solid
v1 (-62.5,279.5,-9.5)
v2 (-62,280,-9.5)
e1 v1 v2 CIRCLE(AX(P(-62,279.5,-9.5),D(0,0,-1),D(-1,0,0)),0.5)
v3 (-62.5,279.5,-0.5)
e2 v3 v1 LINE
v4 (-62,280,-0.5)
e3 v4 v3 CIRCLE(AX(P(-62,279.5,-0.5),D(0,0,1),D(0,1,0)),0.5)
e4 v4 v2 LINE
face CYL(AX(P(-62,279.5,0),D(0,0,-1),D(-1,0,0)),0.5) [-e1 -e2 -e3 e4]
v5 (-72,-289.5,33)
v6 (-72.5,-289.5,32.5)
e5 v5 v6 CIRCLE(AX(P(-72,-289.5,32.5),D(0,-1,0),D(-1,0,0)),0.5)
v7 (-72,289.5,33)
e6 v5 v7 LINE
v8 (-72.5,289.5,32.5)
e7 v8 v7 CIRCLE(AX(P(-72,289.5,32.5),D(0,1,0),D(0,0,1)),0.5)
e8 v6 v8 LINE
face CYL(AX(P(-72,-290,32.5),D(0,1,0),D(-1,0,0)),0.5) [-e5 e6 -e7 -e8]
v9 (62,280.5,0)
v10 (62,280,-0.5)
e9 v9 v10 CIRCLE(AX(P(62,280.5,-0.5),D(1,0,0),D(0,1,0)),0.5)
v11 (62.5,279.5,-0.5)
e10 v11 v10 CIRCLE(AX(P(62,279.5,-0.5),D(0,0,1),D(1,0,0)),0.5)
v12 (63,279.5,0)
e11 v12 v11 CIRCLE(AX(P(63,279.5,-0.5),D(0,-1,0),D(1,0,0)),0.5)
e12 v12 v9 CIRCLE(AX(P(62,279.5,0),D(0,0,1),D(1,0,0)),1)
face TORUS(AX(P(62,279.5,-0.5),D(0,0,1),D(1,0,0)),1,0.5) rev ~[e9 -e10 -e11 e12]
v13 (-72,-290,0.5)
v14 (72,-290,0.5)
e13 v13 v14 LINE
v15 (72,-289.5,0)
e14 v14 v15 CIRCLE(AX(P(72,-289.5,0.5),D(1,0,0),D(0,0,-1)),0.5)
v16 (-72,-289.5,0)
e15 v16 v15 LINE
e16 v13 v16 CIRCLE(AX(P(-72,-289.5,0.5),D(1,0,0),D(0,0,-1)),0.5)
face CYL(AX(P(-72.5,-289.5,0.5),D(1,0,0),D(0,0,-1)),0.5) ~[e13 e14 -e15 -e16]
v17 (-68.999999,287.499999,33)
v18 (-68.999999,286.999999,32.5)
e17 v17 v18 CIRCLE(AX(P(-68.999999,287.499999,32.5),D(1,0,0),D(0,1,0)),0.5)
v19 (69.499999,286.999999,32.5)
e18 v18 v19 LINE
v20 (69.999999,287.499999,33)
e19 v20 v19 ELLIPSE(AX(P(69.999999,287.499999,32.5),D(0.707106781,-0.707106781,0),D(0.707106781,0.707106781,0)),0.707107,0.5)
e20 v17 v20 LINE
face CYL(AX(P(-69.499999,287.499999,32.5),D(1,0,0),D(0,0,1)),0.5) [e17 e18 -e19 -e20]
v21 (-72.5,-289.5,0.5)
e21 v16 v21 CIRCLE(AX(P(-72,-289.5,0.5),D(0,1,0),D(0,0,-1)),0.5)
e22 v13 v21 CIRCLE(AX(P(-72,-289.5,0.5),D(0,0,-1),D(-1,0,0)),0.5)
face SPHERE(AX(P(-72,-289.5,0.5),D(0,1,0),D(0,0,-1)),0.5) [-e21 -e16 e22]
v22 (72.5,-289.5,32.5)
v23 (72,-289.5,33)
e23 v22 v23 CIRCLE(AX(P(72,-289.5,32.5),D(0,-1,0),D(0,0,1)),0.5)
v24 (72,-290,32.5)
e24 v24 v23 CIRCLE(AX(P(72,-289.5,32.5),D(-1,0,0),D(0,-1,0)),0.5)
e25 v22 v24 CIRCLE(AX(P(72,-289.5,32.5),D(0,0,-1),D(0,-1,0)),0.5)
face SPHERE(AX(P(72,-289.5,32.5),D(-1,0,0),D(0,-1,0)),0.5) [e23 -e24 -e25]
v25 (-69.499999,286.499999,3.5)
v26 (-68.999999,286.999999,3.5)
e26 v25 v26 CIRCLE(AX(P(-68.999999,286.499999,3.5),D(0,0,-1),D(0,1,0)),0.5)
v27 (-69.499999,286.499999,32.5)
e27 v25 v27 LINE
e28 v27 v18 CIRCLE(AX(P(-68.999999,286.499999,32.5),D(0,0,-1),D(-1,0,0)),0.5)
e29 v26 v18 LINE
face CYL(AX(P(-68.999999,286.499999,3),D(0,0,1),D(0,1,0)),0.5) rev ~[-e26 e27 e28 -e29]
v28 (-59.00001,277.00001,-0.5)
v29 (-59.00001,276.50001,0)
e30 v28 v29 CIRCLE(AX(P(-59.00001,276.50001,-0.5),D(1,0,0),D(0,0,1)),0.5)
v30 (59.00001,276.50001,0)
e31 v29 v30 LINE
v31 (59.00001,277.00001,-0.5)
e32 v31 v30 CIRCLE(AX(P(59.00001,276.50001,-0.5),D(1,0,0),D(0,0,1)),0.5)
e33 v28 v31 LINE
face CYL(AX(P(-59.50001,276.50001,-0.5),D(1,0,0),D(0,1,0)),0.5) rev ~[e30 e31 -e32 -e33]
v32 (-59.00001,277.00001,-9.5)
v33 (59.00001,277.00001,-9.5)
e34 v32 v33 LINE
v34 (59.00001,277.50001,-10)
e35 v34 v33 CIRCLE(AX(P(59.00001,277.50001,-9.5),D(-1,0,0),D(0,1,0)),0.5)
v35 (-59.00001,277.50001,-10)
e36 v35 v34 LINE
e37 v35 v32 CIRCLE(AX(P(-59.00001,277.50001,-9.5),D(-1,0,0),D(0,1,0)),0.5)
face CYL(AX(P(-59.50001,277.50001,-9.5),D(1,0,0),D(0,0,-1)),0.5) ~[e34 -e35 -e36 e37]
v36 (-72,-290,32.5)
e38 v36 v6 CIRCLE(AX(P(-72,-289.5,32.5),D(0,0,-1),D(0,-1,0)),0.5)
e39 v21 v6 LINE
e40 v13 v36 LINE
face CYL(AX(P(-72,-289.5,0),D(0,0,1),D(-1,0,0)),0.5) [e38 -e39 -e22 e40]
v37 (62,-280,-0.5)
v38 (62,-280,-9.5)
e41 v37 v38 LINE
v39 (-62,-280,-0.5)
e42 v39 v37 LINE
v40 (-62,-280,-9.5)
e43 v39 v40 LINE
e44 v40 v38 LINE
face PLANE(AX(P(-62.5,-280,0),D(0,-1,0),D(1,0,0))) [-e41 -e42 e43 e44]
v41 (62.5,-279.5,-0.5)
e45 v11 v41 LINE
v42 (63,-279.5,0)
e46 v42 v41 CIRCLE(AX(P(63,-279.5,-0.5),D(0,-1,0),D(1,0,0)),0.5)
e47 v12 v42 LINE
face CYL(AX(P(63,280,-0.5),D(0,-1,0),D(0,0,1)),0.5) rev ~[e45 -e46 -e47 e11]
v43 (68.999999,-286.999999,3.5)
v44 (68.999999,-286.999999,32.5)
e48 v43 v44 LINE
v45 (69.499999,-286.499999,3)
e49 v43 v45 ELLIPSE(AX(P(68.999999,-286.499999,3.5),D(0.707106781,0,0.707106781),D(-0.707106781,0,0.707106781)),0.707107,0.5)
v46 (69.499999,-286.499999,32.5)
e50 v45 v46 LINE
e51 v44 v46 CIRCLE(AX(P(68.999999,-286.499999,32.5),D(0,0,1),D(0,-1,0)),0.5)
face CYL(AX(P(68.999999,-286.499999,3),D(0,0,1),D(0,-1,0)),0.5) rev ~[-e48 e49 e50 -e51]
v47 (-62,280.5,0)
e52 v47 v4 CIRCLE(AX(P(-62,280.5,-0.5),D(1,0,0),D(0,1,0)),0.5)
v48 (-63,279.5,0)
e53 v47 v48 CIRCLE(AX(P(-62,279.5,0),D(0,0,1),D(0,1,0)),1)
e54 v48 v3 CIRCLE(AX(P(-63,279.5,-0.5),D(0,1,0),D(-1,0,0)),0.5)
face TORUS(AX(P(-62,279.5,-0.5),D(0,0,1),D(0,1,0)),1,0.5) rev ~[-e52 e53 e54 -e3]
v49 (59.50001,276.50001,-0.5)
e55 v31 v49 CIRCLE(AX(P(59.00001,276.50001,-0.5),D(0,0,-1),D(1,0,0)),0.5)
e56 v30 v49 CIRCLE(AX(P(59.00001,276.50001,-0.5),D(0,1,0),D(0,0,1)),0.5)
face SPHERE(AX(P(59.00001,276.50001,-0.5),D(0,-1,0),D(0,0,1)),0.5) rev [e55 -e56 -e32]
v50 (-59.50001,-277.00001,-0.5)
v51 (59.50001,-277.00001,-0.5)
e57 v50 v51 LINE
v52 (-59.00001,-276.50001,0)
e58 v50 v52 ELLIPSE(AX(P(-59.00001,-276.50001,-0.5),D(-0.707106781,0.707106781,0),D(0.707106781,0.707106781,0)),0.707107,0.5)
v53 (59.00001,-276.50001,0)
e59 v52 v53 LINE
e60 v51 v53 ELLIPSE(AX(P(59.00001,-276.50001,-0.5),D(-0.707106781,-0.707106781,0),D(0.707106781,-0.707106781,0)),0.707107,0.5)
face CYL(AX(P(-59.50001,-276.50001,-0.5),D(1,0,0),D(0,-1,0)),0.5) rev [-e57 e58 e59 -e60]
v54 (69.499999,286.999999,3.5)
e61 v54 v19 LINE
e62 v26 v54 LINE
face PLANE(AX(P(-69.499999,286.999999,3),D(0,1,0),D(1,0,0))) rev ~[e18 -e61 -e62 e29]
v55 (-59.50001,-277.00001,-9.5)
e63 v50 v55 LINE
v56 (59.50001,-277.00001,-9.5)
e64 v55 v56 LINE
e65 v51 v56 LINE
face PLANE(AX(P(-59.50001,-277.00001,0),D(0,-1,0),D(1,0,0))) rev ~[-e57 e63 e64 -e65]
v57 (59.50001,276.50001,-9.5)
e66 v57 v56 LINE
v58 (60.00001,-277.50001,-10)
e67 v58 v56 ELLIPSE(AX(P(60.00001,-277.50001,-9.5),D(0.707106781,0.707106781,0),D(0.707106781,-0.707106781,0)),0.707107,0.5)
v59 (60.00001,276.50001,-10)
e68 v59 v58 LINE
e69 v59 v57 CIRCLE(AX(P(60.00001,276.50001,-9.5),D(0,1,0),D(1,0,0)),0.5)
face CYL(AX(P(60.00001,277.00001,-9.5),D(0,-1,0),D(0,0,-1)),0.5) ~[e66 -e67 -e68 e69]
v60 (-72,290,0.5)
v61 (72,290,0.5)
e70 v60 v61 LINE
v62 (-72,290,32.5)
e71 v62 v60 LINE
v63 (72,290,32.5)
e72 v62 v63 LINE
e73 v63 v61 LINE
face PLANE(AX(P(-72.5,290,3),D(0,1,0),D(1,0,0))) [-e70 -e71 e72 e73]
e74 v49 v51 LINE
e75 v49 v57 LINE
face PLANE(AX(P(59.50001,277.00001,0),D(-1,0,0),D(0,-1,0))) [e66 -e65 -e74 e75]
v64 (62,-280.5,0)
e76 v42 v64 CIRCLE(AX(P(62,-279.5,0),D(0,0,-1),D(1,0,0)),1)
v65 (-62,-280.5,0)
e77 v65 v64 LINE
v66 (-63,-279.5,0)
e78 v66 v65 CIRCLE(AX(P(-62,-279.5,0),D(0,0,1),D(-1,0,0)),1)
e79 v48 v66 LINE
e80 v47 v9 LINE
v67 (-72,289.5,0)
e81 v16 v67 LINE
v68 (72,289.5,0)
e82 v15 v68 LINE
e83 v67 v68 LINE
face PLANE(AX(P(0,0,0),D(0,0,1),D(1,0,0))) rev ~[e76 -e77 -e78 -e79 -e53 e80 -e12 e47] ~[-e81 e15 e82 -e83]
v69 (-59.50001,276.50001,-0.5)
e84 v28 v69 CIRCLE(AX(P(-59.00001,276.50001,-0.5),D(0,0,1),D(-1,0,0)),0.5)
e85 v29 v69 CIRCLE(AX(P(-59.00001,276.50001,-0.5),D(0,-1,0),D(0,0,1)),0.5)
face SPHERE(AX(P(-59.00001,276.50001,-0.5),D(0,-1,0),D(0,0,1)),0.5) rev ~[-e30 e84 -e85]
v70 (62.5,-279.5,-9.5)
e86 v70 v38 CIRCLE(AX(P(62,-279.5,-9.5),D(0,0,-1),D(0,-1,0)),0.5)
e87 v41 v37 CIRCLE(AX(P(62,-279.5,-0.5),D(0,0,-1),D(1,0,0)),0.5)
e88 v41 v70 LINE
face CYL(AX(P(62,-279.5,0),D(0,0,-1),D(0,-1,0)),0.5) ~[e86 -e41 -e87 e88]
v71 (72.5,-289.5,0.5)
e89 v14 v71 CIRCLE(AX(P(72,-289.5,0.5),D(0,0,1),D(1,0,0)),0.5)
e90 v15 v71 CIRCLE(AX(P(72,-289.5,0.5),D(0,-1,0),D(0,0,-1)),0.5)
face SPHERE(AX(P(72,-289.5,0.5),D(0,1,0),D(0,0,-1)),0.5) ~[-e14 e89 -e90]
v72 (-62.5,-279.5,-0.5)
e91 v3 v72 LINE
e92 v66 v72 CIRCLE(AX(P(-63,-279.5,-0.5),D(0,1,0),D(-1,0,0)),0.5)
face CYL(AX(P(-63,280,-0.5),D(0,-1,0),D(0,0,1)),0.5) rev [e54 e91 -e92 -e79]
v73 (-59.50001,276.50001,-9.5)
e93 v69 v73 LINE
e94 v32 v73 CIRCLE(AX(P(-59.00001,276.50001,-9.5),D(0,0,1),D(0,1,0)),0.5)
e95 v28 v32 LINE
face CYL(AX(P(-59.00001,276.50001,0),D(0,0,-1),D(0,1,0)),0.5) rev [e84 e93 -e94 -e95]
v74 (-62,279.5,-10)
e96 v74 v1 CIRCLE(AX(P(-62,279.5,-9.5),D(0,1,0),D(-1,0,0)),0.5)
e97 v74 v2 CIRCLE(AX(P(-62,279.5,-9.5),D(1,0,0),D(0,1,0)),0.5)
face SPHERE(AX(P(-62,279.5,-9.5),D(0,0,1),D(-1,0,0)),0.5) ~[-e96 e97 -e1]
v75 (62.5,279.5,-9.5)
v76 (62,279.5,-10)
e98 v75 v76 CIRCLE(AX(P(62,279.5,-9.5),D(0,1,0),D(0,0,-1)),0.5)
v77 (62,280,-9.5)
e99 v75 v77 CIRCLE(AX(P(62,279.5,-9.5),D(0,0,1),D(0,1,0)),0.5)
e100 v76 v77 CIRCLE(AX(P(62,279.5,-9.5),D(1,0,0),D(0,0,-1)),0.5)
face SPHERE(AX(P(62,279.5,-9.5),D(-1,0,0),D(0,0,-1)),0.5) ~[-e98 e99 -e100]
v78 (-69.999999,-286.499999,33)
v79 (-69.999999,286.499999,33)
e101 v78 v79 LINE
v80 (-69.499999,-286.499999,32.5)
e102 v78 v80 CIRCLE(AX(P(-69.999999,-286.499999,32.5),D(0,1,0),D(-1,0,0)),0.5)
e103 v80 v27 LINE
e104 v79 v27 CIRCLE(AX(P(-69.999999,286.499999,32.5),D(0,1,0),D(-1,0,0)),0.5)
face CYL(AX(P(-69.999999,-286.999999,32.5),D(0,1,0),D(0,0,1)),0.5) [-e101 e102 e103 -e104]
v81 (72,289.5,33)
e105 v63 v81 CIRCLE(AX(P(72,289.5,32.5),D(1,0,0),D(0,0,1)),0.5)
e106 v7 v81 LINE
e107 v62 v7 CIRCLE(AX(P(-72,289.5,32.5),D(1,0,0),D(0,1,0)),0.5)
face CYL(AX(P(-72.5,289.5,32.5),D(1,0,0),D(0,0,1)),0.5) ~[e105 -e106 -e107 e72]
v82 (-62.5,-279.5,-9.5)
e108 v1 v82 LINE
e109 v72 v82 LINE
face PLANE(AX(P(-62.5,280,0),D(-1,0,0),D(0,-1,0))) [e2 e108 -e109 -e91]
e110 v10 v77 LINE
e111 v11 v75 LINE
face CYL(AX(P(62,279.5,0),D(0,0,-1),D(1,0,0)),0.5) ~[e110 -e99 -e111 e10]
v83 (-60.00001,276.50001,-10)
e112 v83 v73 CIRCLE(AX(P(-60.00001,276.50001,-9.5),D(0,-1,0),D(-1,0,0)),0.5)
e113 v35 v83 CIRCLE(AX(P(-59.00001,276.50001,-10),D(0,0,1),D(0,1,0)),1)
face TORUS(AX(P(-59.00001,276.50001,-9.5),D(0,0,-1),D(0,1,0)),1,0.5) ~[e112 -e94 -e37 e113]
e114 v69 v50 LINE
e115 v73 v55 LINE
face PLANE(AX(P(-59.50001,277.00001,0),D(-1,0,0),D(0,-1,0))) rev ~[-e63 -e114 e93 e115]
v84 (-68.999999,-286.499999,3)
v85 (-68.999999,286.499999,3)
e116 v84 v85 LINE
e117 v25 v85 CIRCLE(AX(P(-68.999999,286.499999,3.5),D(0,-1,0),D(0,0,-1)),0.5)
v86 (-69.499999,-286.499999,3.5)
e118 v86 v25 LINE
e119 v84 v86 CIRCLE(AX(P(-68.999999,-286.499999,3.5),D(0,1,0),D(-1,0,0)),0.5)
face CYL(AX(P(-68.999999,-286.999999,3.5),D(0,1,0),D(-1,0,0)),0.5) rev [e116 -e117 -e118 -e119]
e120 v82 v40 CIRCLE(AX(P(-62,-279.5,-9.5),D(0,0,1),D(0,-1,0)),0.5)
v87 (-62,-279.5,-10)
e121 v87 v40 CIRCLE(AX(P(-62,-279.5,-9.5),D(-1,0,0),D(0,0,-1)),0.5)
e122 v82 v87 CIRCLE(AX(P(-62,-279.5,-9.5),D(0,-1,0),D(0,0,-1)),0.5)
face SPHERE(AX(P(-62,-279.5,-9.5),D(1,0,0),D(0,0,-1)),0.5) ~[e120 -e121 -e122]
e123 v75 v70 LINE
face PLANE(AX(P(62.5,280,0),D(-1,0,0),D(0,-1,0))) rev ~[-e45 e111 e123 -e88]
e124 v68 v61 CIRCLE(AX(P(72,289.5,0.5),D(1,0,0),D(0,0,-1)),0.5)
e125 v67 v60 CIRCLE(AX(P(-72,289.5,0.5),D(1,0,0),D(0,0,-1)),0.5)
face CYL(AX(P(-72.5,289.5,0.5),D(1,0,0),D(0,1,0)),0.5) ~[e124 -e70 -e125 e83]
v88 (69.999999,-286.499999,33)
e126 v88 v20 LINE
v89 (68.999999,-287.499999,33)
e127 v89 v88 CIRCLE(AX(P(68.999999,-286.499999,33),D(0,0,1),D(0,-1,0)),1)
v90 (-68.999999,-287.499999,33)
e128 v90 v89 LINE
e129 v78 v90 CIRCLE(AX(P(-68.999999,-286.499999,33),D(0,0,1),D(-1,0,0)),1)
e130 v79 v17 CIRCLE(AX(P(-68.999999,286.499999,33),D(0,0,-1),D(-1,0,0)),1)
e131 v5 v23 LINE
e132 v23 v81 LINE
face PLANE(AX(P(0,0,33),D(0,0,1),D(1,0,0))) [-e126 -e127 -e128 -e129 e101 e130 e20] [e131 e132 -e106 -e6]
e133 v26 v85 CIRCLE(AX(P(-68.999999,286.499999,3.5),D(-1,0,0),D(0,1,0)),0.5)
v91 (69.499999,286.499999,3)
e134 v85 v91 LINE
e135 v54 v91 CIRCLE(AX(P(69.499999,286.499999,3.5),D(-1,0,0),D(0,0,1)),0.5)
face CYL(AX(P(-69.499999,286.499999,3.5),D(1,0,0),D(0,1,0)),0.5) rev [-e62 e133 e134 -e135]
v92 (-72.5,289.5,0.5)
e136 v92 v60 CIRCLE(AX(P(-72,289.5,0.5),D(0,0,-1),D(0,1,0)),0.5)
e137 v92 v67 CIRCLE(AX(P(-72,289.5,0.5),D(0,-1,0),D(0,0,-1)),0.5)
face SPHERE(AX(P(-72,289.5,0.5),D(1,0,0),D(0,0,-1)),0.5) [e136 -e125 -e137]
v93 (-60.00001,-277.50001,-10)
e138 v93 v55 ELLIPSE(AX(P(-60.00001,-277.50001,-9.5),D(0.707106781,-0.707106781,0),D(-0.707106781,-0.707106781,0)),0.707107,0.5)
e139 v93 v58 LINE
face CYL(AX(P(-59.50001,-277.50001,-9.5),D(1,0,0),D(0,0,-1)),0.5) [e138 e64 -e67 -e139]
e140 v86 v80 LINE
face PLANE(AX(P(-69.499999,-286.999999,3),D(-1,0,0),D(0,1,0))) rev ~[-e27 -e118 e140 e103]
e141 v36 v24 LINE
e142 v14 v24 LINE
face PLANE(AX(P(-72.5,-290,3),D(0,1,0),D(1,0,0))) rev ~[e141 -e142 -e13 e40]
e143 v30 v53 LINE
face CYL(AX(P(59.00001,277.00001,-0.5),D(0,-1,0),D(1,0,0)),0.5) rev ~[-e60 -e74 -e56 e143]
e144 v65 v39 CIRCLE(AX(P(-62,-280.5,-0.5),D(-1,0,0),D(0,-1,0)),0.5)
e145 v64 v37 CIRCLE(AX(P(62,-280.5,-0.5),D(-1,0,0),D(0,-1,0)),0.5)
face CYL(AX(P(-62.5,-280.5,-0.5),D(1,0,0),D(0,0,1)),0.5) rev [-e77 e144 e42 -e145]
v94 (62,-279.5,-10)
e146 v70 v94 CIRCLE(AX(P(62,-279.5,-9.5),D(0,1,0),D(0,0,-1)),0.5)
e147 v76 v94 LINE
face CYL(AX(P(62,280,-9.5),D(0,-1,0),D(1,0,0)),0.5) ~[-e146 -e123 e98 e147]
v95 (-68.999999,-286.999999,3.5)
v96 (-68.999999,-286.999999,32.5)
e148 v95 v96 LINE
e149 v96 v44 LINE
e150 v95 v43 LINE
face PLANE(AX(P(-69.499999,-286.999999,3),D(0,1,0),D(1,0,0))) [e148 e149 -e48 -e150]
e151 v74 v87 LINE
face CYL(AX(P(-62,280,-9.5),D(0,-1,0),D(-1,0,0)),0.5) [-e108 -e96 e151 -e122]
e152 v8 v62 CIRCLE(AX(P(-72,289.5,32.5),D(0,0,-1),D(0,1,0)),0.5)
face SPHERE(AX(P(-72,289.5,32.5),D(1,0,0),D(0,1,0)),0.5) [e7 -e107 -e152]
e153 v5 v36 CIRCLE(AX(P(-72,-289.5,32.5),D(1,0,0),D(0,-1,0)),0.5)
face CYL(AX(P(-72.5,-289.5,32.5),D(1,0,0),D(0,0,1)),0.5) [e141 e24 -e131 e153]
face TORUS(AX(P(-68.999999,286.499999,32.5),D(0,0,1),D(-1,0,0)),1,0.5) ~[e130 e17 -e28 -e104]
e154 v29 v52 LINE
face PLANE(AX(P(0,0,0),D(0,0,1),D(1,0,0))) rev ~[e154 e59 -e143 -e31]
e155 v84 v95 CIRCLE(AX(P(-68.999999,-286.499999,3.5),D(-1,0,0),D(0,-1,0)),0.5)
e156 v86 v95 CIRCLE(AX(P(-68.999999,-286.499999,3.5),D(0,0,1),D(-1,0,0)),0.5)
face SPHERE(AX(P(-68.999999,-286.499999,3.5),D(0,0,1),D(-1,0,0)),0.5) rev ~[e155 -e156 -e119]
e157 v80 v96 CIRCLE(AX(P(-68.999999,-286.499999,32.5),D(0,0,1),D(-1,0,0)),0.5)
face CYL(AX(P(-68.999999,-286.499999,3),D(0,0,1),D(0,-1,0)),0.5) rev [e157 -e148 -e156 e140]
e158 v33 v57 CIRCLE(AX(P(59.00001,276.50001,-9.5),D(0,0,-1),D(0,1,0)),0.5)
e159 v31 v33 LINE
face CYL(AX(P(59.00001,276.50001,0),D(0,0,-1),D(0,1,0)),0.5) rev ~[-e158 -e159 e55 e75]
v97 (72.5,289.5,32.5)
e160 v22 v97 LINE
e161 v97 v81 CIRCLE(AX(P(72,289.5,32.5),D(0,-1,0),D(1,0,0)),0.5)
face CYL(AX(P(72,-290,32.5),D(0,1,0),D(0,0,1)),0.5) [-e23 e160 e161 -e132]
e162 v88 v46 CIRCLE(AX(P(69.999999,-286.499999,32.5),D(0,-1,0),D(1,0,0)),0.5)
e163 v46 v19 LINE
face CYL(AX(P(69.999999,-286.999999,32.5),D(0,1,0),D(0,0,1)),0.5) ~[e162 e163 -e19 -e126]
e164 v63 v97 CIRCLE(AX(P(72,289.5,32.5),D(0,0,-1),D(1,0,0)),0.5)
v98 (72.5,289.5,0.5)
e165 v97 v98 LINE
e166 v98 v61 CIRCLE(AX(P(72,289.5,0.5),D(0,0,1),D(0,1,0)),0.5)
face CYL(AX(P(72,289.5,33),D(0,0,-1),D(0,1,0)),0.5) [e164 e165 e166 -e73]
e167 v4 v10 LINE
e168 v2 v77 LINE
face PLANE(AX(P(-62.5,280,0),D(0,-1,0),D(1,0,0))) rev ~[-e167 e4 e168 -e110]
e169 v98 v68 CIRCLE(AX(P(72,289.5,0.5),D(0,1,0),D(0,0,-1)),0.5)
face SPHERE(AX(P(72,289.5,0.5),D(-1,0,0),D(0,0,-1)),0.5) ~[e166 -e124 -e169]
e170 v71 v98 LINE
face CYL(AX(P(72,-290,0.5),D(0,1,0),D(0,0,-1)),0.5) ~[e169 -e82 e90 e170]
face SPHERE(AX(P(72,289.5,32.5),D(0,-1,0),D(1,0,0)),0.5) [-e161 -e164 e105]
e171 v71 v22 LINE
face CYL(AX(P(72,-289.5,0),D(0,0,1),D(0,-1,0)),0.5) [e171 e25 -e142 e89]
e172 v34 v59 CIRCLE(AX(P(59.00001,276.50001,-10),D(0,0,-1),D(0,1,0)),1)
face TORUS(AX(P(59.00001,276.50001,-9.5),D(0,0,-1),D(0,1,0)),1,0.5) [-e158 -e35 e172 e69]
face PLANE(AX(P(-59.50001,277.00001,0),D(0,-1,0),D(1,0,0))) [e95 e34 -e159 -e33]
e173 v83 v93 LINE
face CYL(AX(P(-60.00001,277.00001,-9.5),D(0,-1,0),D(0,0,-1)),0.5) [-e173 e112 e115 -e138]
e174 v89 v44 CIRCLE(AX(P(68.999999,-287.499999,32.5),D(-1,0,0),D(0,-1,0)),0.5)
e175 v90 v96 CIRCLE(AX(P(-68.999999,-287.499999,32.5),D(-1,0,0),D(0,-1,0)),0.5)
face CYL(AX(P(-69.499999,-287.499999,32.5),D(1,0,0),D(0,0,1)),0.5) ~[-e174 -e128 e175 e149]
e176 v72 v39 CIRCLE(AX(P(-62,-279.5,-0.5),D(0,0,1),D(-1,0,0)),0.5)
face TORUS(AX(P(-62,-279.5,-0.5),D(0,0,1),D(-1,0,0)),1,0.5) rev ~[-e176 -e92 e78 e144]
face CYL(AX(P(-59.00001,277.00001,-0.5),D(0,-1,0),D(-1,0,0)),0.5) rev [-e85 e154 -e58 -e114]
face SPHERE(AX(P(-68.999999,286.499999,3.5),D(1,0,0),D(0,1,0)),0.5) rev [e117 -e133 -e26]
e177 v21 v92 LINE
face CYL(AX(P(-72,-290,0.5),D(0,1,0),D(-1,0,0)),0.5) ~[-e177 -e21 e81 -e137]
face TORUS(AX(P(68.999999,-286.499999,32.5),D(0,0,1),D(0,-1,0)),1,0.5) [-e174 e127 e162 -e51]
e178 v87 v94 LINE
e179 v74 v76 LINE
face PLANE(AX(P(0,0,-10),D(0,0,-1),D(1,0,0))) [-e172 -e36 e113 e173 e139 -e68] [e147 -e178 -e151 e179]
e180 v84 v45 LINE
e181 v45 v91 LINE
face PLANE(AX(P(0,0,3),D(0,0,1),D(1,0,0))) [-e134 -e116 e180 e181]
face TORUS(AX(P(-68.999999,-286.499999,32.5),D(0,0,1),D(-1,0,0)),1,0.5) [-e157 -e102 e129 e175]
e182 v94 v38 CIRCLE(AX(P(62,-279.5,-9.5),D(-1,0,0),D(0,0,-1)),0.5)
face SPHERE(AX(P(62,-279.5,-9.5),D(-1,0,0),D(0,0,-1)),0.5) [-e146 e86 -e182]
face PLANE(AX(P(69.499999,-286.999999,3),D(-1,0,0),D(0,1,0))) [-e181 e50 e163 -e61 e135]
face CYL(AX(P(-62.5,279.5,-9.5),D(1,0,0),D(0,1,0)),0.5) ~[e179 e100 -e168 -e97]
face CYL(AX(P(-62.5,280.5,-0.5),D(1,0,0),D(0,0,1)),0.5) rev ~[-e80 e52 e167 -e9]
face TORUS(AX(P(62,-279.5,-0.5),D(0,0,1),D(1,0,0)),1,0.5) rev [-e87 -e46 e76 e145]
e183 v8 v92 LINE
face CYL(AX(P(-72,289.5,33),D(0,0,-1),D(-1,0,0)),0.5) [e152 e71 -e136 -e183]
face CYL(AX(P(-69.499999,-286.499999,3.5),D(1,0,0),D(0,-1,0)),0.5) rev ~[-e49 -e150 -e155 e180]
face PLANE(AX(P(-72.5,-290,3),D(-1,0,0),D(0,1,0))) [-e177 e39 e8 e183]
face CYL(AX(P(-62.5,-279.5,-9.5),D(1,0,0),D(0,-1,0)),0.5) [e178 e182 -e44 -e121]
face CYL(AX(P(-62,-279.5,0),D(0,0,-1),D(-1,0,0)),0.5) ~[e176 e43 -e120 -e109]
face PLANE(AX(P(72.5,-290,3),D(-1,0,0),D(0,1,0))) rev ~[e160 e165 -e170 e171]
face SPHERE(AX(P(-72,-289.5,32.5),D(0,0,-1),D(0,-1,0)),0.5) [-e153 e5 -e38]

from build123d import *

# Parameters (mm, degrees)
F0_W     = 145
F0_H     = 580
F1_DEPTH = 3
F2_W     = 145
F2_H     = 580
F2_W_2   = 138.9999985695
F2_H_2   = 573.9999985695
F3_DEPTH = 30
F4_W     = 125
F4_H     = 560
F4_W_2   = 119.0000200272
F4_H_2   = 554.0000200272
F5_DEPTH = 10
F6_R     = 0.5


with BuildPart() as f1:
    # F0 (on Top) → F1 (new body)
    with BuildSketch(Plane.XY):
        Rectangle(F0_W, F0_H)
    extrude(amount=F1_DEPTH)

    # F2 (on face) → F3 (join)
    with BuildSketch(Plane.XY.offset(3)):
        Rectangle(F2_W, F2_H)
        Rectangle(F2_W_2, F2_H_2, mode=Mode.SUBTRACT)
    extrude(amount=F3_DEPTH)

    # F4 (on face) → F5 (join)
    with BuildSketch(Plane(origin=(0, 0, 0), x_dir=(1, 0, 0), z_dir=(0, 0, -1))):
        Rectangle(F4_W, F4_H)
        Rectangle(F4_W_2, F4_H_2, mode=Mode.SUBTRACT)
    extrude(amount=F5_DEPTH)

    # F6
    f6_edges = [f1.edges().sort_by_distance(p)[0] for p in [
        (0, 290, 0),
        (72.5, 0, 0),
        (-72.5, 0, 0),
        (0, -290, 0),
        (62.5, 0, 0),
        (0, 280, 0),
        (-62.5, 0, 0),
        (0, -280, 0),
        (59.50001, 0, 0),
        (0, -277.00001, 0),
        (-59.50001, 0, 0),
        (0, 277.00001, 0),
        (-62.5, 280, -5),
        (0, -280, -10),
        (-62.5, 0, -10),
        (0, 280, -10),
        (62.5, 0, -10),
        (0, 277.00001, -10),
        (-59.50001, 0, -10),
        (0, -277.00001, -10),
        (59.50001, 0, -10),
        (59.50001, 277.00001, -5),
        (-59.50001, 277.00001, -5),
        (62.5, -280, -5),
        (-62.5, -280, -5),
        (62.5, 280, -5),
        (-72.5, -290, 16.5),
        (0, -290, 33),
        (72.5, -290, 16.5),
        (72.5, 0, 33),
        (72.5, 290, 16.5),
        (0, 290, 33),
        (-72.5, 290, 16.5),
        (69.499999, 0, 33),
        (0, 286.999999, 3),
        (-69.499999, -286.999999, 18),
        (-69.499999, 286.999999, 18),
        (-69.499999, 0, 3),
        (-69.499999, 0, 33),
        (69.499999, -286.999999, 18),
        (0, -286.999999, 3),
        (0, -286.999999, 33),
        (-72.5, 0, 33),
        (0, 286.999999, 33),
    ]]
    fillet(f6_edges, radius=F6_R)


solid = f1.part
